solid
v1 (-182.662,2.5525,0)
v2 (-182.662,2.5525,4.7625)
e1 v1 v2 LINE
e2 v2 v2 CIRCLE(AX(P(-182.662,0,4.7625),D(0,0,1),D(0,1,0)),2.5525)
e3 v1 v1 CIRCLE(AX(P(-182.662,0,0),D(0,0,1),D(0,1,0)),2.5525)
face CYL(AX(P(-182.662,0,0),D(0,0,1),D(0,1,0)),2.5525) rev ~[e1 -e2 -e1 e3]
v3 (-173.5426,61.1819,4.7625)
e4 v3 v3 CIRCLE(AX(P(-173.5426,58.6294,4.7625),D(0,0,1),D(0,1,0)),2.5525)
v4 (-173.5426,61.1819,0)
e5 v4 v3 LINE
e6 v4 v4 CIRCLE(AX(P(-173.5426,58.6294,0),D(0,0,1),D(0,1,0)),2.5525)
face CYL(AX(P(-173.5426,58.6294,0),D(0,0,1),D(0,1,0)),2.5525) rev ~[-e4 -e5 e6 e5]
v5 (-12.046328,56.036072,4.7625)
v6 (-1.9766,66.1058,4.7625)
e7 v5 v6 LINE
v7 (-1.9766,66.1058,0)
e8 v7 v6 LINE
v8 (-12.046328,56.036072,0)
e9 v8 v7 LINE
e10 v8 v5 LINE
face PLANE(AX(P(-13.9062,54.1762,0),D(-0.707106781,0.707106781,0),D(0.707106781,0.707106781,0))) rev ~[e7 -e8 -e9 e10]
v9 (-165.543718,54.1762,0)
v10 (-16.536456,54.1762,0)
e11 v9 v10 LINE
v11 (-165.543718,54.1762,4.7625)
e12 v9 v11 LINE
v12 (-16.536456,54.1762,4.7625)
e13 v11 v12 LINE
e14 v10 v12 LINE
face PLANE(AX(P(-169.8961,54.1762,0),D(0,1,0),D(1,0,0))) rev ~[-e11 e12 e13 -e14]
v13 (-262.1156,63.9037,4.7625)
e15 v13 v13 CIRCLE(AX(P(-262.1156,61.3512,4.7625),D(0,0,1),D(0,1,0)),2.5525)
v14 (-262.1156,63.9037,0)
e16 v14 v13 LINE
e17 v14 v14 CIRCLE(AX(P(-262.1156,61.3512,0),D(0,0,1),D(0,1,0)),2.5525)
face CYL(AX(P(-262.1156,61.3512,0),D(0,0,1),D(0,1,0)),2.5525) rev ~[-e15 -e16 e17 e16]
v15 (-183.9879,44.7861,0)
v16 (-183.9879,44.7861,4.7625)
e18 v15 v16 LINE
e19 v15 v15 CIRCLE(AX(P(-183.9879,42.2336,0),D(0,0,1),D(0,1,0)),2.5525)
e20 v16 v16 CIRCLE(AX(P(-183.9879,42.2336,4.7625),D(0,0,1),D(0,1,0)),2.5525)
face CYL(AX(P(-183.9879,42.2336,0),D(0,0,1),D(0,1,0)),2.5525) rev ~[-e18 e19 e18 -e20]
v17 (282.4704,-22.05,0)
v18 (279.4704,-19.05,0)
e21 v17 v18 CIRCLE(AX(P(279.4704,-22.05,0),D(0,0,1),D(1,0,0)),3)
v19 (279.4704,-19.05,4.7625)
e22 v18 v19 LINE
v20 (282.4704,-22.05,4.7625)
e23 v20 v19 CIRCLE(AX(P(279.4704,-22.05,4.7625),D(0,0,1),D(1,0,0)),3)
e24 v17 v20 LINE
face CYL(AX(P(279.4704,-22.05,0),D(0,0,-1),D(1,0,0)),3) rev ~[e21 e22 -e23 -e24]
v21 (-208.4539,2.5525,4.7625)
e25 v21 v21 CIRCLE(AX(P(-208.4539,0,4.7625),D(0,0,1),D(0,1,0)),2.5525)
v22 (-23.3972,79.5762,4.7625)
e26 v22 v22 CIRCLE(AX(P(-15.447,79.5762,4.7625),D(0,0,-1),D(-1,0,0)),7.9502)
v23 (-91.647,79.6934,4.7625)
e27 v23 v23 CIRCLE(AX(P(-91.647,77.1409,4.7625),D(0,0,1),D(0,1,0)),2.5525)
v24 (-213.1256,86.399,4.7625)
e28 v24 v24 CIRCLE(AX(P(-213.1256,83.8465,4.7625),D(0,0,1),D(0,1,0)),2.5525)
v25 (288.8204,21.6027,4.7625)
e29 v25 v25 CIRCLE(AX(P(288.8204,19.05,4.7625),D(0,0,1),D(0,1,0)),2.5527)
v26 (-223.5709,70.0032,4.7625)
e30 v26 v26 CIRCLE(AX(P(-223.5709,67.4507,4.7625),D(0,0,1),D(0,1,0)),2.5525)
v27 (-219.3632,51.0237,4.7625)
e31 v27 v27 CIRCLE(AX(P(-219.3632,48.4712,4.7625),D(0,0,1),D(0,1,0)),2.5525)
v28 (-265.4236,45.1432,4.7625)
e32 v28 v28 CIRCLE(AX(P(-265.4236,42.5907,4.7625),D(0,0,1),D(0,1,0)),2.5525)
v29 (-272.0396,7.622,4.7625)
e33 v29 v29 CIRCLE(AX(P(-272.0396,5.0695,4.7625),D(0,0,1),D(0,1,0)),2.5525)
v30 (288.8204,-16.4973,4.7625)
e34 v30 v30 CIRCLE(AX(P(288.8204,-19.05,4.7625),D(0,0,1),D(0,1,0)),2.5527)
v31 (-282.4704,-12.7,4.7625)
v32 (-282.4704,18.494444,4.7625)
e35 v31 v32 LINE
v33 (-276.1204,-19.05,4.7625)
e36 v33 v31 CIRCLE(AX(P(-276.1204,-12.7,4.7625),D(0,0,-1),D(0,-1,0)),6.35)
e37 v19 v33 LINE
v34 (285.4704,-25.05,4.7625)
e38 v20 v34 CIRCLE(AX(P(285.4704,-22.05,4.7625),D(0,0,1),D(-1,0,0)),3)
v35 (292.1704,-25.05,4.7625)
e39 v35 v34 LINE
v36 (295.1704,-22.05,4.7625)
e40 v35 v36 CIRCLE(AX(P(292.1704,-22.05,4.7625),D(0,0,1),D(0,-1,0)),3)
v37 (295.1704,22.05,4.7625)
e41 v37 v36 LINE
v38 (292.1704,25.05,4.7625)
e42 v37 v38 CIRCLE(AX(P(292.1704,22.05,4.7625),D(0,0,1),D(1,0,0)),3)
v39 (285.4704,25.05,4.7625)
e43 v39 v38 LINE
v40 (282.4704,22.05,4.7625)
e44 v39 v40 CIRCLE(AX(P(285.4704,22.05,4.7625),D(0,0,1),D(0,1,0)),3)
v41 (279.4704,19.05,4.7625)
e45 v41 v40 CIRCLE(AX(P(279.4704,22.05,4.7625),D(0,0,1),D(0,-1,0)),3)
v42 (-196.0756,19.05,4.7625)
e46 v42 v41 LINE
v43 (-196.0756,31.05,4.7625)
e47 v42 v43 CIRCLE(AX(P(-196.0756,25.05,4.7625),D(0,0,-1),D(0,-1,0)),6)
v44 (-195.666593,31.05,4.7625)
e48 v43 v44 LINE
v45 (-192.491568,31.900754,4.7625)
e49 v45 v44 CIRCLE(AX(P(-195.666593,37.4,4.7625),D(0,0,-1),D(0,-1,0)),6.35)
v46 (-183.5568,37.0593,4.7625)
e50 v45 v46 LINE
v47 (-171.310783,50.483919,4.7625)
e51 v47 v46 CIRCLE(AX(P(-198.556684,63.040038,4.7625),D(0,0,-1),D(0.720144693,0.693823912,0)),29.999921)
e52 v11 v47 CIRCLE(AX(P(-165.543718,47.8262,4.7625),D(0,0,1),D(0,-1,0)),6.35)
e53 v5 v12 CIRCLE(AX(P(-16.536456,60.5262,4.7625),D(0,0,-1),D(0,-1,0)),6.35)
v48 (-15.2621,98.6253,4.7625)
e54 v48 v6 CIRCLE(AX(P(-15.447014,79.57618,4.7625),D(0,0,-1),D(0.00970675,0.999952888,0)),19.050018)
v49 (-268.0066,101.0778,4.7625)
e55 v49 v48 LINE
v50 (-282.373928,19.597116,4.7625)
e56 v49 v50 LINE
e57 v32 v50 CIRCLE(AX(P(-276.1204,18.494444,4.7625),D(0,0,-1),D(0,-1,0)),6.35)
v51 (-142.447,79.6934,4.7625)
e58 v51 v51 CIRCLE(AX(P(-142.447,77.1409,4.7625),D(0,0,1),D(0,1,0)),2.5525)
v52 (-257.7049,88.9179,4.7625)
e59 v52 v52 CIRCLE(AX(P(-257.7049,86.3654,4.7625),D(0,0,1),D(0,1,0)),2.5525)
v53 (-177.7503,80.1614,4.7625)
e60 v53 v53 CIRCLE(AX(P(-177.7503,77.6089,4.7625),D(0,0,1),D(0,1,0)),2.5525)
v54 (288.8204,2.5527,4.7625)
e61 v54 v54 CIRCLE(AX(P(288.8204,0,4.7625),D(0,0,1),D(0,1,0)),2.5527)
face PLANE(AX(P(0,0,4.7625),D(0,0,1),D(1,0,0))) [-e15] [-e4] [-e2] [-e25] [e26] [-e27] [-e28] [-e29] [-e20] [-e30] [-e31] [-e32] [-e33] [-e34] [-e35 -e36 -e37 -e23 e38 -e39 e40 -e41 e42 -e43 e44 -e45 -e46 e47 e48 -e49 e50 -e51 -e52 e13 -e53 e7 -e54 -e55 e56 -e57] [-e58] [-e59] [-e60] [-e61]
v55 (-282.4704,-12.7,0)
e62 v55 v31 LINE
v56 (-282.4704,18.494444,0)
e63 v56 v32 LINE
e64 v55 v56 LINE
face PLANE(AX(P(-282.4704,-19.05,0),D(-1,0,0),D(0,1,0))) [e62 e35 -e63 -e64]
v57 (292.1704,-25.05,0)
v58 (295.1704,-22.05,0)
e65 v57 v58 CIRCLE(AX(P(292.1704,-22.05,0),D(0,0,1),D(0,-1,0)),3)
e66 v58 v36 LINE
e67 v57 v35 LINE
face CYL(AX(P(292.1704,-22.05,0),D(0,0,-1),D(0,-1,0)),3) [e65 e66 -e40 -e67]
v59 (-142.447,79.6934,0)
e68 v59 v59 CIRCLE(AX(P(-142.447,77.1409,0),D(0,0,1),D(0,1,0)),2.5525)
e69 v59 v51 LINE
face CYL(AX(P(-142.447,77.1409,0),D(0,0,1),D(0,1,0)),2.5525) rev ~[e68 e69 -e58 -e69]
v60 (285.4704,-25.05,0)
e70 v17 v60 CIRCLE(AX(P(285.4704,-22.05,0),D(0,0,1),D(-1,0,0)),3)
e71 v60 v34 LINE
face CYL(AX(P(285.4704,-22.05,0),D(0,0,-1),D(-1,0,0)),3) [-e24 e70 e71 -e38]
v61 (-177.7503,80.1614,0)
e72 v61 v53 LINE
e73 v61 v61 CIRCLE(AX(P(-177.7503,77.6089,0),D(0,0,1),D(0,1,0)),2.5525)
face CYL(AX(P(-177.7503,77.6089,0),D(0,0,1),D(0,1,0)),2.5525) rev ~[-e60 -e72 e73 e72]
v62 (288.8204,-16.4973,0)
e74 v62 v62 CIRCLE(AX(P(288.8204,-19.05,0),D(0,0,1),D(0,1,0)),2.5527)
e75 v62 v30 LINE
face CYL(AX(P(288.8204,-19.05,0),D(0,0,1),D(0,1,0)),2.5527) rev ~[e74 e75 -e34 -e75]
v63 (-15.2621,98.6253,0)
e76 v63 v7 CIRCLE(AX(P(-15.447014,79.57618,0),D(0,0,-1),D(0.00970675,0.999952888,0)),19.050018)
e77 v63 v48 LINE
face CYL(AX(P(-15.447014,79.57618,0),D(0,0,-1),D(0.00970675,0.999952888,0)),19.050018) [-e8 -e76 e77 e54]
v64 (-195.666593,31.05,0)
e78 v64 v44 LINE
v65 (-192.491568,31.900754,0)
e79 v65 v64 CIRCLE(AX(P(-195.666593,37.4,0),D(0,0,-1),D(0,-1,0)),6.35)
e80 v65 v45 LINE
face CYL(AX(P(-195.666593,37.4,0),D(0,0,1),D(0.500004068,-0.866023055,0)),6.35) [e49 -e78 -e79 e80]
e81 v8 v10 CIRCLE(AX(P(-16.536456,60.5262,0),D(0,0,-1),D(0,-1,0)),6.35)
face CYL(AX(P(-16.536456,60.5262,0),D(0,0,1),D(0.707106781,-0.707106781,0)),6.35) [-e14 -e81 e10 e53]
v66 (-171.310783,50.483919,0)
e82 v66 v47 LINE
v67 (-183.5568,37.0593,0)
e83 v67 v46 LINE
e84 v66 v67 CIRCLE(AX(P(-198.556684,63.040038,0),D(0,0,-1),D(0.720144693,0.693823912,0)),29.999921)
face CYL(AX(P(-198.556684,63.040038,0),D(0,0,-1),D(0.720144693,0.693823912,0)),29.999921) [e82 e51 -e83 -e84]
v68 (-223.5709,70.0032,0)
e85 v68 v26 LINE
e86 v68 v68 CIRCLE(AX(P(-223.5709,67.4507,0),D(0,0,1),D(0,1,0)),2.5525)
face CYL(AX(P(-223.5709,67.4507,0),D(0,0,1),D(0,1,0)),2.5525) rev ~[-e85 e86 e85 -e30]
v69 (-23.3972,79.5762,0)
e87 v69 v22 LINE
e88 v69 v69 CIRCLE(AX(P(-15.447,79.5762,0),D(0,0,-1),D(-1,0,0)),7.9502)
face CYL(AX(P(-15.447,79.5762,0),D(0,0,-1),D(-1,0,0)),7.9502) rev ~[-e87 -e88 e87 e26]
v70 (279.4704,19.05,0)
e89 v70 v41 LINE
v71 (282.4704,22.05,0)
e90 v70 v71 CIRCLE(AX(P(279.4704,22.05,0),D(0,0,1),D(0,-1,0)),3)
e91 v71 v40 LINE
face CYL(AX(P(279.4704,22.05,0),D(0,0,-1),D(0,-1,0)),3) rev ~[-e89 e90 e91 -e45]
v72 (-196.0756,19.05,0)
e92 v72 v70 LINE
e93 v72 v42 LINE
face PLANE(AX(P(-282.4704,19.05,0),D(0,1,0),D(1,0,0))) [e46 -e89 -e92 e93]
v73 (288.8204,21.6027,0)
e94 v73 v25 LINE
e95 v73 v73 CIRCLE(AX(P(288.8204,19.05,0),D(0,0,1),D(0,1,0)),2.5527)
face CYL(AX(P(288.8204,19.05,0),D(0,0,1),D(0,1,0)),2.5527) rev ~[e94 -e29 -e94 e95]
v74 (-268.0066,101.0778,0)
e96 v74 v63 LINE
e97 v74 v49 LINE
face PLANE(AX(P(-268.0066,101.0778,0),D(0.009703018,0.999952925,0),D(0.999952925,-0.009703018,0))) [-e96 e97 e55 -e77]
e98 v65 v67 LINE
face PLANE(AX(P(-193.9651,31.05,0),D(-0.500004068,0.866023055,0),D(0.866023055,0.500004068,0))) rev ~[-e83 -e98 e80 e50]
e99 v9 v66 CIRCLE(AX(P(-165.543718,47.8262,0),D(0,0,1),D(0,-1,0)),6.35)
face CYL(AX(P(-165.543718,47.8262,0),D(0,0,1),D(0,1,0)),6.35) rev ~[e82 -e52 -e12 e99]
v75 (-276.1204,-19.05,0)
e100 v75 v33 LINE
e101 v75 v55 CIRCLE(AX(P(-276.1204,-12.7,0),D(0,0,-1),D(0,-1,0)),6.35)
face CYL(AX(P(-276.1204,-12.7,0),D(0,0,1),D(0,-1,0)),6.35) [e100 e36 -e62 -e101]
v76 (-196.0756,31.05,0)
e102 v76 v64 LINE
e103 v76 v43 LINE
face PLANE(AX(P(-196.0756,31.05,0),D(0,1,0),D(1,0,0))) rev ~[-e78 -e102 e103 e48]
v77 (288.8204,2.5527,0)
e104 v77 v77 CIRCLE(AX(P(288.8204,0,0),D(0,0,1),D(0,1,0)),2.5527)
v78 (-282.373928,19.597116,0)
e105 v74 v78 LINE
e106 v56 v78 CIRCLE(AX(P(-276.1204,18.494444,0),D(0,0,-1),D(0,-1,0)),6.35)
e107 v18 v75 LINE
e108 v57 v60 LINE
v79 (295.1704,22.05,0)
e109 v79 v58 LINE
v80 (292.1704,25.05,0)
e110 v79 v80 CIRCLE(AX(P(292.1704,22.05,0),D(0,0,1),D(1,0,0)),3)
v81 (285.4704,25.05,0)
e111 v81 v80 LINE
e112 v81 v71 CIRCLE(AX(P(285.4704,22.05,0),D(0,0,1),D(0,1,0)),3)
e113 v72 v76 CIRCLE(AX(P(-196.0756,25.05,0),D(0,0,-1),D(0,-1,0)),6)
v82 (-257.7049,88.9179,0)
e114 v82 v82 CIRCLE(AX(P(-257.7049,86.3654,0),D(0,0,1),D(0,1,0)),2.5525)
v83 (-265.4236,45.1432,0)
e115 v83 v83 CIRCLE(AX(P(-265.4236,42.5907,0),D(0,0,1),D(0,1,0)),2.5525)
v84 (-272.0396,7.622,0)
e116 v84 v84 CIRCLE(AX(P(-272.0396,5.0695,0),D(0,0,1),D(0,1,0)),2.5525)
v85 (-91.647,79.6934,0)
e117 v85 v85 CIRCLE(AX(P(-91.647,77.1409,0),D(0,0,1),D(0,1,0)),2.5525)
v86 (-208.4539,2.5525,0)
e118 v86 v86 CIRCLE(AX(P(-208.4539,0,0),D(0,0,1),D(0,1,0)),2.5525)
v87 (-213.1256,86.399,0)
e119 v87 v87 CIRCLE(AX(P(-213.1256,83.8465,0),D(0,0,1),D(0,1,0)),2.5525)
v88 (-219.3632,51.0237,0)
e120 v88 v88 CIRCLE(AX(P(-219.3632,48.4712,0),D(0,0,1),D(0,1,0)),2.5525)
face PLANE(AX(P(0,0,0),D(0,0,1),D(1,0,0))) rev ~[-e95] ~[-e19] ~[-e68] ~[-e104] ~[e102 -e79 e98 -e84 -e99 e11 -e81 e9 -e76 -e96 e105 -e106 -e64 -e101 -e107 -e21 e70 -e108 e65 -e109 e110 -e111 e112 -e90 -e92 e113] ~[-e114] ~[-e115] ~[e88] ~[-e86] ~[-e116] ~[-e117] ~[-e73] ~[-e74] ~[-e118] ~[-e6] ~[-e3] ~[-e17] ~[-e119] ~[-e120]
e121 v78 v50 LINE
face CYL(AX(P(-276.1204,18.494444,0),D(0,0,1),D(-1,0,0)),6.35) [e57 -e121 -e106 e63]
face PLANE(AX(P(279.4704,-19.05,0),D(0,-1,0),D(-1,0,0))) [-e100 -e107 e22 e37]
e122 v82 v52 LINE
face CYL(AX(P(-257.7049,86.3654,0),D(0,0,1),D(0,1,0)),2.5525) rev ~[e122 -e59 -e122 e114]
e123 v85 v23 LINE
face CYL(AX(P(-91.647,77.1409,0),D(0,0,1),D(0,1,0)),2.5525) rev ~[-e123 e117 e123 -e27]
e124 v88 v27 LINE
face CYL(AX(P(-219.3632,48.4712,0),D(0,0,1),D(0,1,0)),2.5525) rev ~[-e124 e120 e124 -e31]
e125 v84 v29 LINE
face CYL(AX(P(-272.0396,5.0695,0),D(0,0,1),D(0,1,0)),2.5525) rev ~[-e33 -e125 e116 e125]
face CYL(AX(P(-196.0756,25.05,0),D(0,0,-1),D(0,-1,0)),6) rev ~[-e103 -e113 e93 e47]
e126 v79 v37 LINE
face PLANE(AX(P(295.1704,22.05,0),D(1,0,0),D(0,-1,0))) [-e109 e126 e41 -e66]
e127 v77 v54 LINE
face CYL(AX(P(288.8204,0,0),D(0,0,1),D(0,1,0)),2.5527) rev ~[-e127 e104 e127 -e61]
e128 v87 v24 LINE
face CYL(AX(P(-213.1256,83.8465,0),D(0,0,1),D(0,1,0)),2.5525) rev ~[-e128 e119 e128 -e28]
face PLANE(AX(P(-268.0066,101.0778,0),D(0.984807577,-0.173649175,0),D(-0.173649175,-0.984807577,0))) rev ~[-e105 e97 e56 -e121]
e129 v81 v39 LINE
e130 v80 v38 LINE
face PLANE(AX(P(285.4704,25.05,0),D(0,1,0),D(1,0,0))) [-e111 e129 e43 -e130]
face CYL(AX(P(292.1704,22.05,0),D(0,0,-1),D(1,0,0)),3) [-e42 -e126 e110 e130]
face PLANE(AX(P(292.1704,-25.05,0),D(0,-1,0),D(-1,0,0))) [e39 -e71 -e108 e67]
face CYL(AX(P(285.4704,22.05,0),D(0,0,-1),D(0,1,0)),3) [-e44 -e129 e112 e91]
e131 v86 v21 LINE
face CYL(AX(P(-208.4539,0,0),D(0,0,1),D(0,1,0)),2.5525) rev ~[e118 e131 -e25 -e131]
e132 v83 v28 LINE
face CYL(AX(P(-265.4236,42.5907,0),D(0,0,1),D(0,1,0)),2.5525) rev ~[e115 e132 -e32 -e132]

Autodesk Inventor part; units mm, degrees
ref_plane "YZ Plane" through (0, 0, 0) normal (1, 0, 0) x (0, 1, 0)
ref_plane "XZ Plane" through (0, 0, 0) normal (0, 1, 0) x (-1, 0, 0)
ref_plane "XY Plane" through (0, 0, 0) normal (0, 0, 1) x (1, 0, 0)
sketch "Sketch1" plane through (0, 0, 0) normal (0, 0, 1) x (1, 0, 0)
  line L0 (279.4704, -19.05) -> (-282.4704, -19.05)
  line L1 (-282.4704, -19.05) -> (-282.4704, 19.05)
  line L2 (-282.4704, 19.05) -> (279.4704, 19.05)
  line L3 (282.4704, -19.05) -> (-282.4704, 19.05) construction
  line L4 (-282.4704, -19.05) -> (282.4704, 19.05) construction
  line L5 (292.1704, -25.05) -> (285.4704, -25.05)
  line L6 (285.4704, 25.05) -> (292.1704, 25.05)
  line L7 (295.1704, 22.05) -> (295.1704, -22.05)
  line L8 (295.1704, -25.05) -> (282.4704, 25.05) construction
  line L9 (282.4704, -25.05) -> (295.1704, 25.05) construction
  line L10 (282.4704, -22.05) -> (282.4704, -22.05)
  line L11 (282.4704, 22.05) -> (282.4704, 22.05)
  arc A0 (279.4704, 19.05) -> (282.4704, 22.05) centre (279.4704, 22.05) ccw
  arc A1 (285.4704, 25.05) -> (282.4704, 22.05) centre (285.4704, 22.05) ccw
  arc A2 (295.1704, 22.05) -> (292.1704, 25.05) centre (292.1704, 22.05) ccw
  arc A3 (292.1704, -25.05) -> (295.1704, -22.05) centre (292.1704, -22.05) ccw
  arc A4 (282.4704, -22.05) -> (285.4704, -25.05) centre (285.4704, -22.05) ccw
  arc A5 (282.4704, -22.05) -> (279.4704, -19.05) centre (279.4704, -22.05) ccw
  point P0 (0, 0)
  point P1 (288.8204, 0)
  point P2 (282.4704, 0)
  point P3 (295.1704, 0)
  dimension "d0" = 12.7
  dimension "d1" = 577.6407
  dimension "d2" = 6
  dimension "d3" = 38.1
  dimension "d4" = 3
extrude "Plate1" add sketch "Sketch1" along normal blind 4.7625
sketch "Sketch2" plane through (0, 0, 0) normal (0, 0, -1) x (-1, 0, 0)
  line L0 (-288.8204, -19.05) -> (-288.8204, 19.05)
  line L1 (-295.1704, -22.05) -> (-295.1704, 22.05) projected
  line L2 (-288.8204, 0) -> (-295.1704, 0)
  point P0 (0, 0)
  dimension "d6" = 6.35
  dimension "d7" = 38.1
hole "Hole1" at (288.8204, -19.05, 0) at (288.8204, 0, 0) at (288.8204, 19.05, 0) direction (0, 0, 1) diameter 5.1054 depth 4.7625 tip angle 118 clearance for "Flat Head Machine Screw (82)" size "#10" standard "Ansi Unified Screw Threads"
sketch "Sketch3" plane through (0, 0, 0) normal (0, 0, -1) x (-1, 0, 0)
  line L0 (268.0066, 101.0778) -> (282.4704, 19.05)
  line L1 (180.2314, 85.6006) -> (268.0066, 101.0778)
  arc A0 (180.2314, 85.6006) -> (176.9524, 83.8547) centre (181.2732, 79.6918) ccw
  arc A1 (176.9524, 83.8547) -> (183.5568, 37.0593) centre (198.5568, 63.04) ccw
  line L2 (-279.4704, 19.05) -> (282.4704, 19.05)
  line L3 (282.4704, 19.05) -> (214.7497, 19.05)
  line L4 (282.4704, 19.05) -> (282.4704, -19.05)
  arc A2 (196.0756, 19.05) -> (196.0756, 31.05) centre (196.0756, 25.05) ccw
  line L5 (196.0756, 31.05) -> (193.9651, 31.05)
  line L6 (193.9651, 31.05) -> (183.5568, 37.0593)
  arc A3 (169.2665, 76.5071) -> (165.9875, 74.7612) centre (170.3084, 70.5983) ccw
  line L7 (169.8961, 54.1762) -> (13.9062, 54.1762)
  arc A4 (15.2621, 98.6253) -> (1.9766, 66.1058) centre (15.447, 79.5762) ccw
  line L8 (268.0066, 101.0778) -> (15.2621, 98.6253)
  line L9 (13.9062, 54.1762) -> (1.9766, 66.1058)
  circle A5 centre (15.447, 79.5762) radius 7.9502
  line L10 (282.4704, 19.05) -> (-279.4704, 19.05)
  point P0 (0, 0)
  point P1 (187.5919, 53.9466)
  dimension "d16" = 43.99
  dimension "d17" = 80
  dimension "d18" = 83.9136
  dimension "d19" = 30
  dimension "d20" = 6
  dimension "d21" = 83.2932
  dimension "d28" = 12
  dimension "d29" = 86.3948
  dimension "d30" = 30
  dimension "d44" = 6
  dimension "d45" = 25.4
  dimension "d46" = 38.1
  dimension "d47" = 135
  dimension "d48" = 15.9004
  dimension "d49" = 35.1262
  dimension "d50" = 252.4564
sheet face with bend "Face2" sketch "Sketch3" thickness 4.7625 toward (0, 0, 1) bend radius 4.7625
bend "Bend1"
fillet "Corner Round1" radius 6.35 5 edges at (-282.4704, 19.05, 2.3813) (-282.4704, -19.05, 2.3813) (-193.9651, 31.05, 2.3813) (-13.9062, 54.1762, 2.3813) (-169.8961, 54.1762, 2.3813)
sketch "Sketch4" plane through (0, 0, 0) normal (0, 0, -1) x (-1, 0, 0)
  line L0 (282.3739, 19.5971) -> (268.0066, 101.0778) projected
  arc A0 (169.8961, 54.1762) -> (183.5568, 37.0593) centre (198.5568, 63.04) ccw projected
  circle A1 centre (198.5568, 63.04) radius 25.4
  line L1 (177.7503, 77.6089) -> (213.1256, 83.8465)
  line L2 (213.1256, 83.8465) -> (183.9879, 42.2336)
  line L3 (183.9879, 42.2336) -> (219.3632, 48.4712)
  line L4 (173.5426, 58.6294) -> (223.5709, 67.4507)
  line L5 (282.3739, 19.5971) -> (268.0066, 101.0778) projected
  line L6 (262.1156, 61.3512) -> (265.4236, 42.5907)
  line L7 (196.0756, 19.05) -> (-279.4704, 19.05) projected
  line L8 (268.0066, 101.0778) -> (15.2621, 98.6253) projected
  line L9 (16.5365, 54.1762) -> (165.5437, 54.1762) projected
  circle A2 centre (15.447, 79.5762) radius 7.9502 projected
  point P0 (0, 0)
  point P1 (257.7049, 86.3654)
  point P2 (272.0396, 5.0695)
  point P3 (208.4539, 0)
  point P4 (182.662, 0)
  point P5 (142.447, 77.1409)
  point P6 (91.647, 77.1409)
  dimension "d31" = 25.4
  dimension "d33" = 12.7
  dimension "d34" = 12.7
  dimension "d42" = 50.8
  dimension "d43" = 45
  dimension "d51" = 5.2605
  dimension "d52" = 19.05
  dimension "d53" = 38.1
  dimension "d54" = 19.05
  dimension "d55" = 19.05
  dimension "d56" = 76.2
  dimension "d57" = 101.6
  dimension "d58" = 22.2246
  dimension "d60" = 44.4491
  dimension "d61" = 50.8
  dimension "d62" = 76.2
hole "Hole2" at (-257.7049, 86.3654, 0) at (-262.1156, 61.3512, 0) at (-177.7503, 77.6089, 0) at (-173.5426, 58.6294, 0) at (-183.9879, 42.2336, 0) at (-219.3632, 48.4712, 0) at (-223.5709, 67.4507, 0) at (-213.1256, 83.8465, 0) at (-272.0396, 5.0695, 0) at (-265.4236, 42.5907, 0) at (-208.4539, 0, 0) at (-182.662, 0, 0) at (-142.447, 77.1409, 0) at (-91.647, 77.1409, 0) direction (0, 0, 1) diameter 5.105 end through all clearance for "Flat Head Machine Screw (82)" size "#10" standard "Ansi Unified Screw Threads"
equation "\"d13\" = Thickness"
equation "\"d33\" = d32"
equation "\"d34\" = d32"
equation "\"d58\" = 0.5 * d60"
equation "\"d40\" = Thickness"
equation "\"d5\" = Thickness"
equation "\"d22\" = BendRadius"
equation "\"d23\" = BendReliefWidth"
equation "\"d25\" = MinimumRemnant"
equation "\"d24\" = BendReliefDepth"
equation "\"d26\" = TransitionRadius"
equation "\"BendRadius\" = Thickness"
equation "\"BendReliefWidth\" = Thickness"
equation "\"BendReliefDepth\" = 0.5 * Thickness"
equation "\"CornerReliefSize\" = 4 * Thickness"
equation "\"MinimumRemnant\" = 2 * Thickness"
equation "\"TransitionRadius\" = BendRadius"
equation "\"JacobiRadiusSize\" = BendRadius"
equation "\"GapSize\" = Thickness"
equation "\"Thickness\" = 4.7625"
equation "\"d32\" = 12.7"
properties part number "RACK_GUIDES" material "Polycarbonate, PC 1000, Clear"
